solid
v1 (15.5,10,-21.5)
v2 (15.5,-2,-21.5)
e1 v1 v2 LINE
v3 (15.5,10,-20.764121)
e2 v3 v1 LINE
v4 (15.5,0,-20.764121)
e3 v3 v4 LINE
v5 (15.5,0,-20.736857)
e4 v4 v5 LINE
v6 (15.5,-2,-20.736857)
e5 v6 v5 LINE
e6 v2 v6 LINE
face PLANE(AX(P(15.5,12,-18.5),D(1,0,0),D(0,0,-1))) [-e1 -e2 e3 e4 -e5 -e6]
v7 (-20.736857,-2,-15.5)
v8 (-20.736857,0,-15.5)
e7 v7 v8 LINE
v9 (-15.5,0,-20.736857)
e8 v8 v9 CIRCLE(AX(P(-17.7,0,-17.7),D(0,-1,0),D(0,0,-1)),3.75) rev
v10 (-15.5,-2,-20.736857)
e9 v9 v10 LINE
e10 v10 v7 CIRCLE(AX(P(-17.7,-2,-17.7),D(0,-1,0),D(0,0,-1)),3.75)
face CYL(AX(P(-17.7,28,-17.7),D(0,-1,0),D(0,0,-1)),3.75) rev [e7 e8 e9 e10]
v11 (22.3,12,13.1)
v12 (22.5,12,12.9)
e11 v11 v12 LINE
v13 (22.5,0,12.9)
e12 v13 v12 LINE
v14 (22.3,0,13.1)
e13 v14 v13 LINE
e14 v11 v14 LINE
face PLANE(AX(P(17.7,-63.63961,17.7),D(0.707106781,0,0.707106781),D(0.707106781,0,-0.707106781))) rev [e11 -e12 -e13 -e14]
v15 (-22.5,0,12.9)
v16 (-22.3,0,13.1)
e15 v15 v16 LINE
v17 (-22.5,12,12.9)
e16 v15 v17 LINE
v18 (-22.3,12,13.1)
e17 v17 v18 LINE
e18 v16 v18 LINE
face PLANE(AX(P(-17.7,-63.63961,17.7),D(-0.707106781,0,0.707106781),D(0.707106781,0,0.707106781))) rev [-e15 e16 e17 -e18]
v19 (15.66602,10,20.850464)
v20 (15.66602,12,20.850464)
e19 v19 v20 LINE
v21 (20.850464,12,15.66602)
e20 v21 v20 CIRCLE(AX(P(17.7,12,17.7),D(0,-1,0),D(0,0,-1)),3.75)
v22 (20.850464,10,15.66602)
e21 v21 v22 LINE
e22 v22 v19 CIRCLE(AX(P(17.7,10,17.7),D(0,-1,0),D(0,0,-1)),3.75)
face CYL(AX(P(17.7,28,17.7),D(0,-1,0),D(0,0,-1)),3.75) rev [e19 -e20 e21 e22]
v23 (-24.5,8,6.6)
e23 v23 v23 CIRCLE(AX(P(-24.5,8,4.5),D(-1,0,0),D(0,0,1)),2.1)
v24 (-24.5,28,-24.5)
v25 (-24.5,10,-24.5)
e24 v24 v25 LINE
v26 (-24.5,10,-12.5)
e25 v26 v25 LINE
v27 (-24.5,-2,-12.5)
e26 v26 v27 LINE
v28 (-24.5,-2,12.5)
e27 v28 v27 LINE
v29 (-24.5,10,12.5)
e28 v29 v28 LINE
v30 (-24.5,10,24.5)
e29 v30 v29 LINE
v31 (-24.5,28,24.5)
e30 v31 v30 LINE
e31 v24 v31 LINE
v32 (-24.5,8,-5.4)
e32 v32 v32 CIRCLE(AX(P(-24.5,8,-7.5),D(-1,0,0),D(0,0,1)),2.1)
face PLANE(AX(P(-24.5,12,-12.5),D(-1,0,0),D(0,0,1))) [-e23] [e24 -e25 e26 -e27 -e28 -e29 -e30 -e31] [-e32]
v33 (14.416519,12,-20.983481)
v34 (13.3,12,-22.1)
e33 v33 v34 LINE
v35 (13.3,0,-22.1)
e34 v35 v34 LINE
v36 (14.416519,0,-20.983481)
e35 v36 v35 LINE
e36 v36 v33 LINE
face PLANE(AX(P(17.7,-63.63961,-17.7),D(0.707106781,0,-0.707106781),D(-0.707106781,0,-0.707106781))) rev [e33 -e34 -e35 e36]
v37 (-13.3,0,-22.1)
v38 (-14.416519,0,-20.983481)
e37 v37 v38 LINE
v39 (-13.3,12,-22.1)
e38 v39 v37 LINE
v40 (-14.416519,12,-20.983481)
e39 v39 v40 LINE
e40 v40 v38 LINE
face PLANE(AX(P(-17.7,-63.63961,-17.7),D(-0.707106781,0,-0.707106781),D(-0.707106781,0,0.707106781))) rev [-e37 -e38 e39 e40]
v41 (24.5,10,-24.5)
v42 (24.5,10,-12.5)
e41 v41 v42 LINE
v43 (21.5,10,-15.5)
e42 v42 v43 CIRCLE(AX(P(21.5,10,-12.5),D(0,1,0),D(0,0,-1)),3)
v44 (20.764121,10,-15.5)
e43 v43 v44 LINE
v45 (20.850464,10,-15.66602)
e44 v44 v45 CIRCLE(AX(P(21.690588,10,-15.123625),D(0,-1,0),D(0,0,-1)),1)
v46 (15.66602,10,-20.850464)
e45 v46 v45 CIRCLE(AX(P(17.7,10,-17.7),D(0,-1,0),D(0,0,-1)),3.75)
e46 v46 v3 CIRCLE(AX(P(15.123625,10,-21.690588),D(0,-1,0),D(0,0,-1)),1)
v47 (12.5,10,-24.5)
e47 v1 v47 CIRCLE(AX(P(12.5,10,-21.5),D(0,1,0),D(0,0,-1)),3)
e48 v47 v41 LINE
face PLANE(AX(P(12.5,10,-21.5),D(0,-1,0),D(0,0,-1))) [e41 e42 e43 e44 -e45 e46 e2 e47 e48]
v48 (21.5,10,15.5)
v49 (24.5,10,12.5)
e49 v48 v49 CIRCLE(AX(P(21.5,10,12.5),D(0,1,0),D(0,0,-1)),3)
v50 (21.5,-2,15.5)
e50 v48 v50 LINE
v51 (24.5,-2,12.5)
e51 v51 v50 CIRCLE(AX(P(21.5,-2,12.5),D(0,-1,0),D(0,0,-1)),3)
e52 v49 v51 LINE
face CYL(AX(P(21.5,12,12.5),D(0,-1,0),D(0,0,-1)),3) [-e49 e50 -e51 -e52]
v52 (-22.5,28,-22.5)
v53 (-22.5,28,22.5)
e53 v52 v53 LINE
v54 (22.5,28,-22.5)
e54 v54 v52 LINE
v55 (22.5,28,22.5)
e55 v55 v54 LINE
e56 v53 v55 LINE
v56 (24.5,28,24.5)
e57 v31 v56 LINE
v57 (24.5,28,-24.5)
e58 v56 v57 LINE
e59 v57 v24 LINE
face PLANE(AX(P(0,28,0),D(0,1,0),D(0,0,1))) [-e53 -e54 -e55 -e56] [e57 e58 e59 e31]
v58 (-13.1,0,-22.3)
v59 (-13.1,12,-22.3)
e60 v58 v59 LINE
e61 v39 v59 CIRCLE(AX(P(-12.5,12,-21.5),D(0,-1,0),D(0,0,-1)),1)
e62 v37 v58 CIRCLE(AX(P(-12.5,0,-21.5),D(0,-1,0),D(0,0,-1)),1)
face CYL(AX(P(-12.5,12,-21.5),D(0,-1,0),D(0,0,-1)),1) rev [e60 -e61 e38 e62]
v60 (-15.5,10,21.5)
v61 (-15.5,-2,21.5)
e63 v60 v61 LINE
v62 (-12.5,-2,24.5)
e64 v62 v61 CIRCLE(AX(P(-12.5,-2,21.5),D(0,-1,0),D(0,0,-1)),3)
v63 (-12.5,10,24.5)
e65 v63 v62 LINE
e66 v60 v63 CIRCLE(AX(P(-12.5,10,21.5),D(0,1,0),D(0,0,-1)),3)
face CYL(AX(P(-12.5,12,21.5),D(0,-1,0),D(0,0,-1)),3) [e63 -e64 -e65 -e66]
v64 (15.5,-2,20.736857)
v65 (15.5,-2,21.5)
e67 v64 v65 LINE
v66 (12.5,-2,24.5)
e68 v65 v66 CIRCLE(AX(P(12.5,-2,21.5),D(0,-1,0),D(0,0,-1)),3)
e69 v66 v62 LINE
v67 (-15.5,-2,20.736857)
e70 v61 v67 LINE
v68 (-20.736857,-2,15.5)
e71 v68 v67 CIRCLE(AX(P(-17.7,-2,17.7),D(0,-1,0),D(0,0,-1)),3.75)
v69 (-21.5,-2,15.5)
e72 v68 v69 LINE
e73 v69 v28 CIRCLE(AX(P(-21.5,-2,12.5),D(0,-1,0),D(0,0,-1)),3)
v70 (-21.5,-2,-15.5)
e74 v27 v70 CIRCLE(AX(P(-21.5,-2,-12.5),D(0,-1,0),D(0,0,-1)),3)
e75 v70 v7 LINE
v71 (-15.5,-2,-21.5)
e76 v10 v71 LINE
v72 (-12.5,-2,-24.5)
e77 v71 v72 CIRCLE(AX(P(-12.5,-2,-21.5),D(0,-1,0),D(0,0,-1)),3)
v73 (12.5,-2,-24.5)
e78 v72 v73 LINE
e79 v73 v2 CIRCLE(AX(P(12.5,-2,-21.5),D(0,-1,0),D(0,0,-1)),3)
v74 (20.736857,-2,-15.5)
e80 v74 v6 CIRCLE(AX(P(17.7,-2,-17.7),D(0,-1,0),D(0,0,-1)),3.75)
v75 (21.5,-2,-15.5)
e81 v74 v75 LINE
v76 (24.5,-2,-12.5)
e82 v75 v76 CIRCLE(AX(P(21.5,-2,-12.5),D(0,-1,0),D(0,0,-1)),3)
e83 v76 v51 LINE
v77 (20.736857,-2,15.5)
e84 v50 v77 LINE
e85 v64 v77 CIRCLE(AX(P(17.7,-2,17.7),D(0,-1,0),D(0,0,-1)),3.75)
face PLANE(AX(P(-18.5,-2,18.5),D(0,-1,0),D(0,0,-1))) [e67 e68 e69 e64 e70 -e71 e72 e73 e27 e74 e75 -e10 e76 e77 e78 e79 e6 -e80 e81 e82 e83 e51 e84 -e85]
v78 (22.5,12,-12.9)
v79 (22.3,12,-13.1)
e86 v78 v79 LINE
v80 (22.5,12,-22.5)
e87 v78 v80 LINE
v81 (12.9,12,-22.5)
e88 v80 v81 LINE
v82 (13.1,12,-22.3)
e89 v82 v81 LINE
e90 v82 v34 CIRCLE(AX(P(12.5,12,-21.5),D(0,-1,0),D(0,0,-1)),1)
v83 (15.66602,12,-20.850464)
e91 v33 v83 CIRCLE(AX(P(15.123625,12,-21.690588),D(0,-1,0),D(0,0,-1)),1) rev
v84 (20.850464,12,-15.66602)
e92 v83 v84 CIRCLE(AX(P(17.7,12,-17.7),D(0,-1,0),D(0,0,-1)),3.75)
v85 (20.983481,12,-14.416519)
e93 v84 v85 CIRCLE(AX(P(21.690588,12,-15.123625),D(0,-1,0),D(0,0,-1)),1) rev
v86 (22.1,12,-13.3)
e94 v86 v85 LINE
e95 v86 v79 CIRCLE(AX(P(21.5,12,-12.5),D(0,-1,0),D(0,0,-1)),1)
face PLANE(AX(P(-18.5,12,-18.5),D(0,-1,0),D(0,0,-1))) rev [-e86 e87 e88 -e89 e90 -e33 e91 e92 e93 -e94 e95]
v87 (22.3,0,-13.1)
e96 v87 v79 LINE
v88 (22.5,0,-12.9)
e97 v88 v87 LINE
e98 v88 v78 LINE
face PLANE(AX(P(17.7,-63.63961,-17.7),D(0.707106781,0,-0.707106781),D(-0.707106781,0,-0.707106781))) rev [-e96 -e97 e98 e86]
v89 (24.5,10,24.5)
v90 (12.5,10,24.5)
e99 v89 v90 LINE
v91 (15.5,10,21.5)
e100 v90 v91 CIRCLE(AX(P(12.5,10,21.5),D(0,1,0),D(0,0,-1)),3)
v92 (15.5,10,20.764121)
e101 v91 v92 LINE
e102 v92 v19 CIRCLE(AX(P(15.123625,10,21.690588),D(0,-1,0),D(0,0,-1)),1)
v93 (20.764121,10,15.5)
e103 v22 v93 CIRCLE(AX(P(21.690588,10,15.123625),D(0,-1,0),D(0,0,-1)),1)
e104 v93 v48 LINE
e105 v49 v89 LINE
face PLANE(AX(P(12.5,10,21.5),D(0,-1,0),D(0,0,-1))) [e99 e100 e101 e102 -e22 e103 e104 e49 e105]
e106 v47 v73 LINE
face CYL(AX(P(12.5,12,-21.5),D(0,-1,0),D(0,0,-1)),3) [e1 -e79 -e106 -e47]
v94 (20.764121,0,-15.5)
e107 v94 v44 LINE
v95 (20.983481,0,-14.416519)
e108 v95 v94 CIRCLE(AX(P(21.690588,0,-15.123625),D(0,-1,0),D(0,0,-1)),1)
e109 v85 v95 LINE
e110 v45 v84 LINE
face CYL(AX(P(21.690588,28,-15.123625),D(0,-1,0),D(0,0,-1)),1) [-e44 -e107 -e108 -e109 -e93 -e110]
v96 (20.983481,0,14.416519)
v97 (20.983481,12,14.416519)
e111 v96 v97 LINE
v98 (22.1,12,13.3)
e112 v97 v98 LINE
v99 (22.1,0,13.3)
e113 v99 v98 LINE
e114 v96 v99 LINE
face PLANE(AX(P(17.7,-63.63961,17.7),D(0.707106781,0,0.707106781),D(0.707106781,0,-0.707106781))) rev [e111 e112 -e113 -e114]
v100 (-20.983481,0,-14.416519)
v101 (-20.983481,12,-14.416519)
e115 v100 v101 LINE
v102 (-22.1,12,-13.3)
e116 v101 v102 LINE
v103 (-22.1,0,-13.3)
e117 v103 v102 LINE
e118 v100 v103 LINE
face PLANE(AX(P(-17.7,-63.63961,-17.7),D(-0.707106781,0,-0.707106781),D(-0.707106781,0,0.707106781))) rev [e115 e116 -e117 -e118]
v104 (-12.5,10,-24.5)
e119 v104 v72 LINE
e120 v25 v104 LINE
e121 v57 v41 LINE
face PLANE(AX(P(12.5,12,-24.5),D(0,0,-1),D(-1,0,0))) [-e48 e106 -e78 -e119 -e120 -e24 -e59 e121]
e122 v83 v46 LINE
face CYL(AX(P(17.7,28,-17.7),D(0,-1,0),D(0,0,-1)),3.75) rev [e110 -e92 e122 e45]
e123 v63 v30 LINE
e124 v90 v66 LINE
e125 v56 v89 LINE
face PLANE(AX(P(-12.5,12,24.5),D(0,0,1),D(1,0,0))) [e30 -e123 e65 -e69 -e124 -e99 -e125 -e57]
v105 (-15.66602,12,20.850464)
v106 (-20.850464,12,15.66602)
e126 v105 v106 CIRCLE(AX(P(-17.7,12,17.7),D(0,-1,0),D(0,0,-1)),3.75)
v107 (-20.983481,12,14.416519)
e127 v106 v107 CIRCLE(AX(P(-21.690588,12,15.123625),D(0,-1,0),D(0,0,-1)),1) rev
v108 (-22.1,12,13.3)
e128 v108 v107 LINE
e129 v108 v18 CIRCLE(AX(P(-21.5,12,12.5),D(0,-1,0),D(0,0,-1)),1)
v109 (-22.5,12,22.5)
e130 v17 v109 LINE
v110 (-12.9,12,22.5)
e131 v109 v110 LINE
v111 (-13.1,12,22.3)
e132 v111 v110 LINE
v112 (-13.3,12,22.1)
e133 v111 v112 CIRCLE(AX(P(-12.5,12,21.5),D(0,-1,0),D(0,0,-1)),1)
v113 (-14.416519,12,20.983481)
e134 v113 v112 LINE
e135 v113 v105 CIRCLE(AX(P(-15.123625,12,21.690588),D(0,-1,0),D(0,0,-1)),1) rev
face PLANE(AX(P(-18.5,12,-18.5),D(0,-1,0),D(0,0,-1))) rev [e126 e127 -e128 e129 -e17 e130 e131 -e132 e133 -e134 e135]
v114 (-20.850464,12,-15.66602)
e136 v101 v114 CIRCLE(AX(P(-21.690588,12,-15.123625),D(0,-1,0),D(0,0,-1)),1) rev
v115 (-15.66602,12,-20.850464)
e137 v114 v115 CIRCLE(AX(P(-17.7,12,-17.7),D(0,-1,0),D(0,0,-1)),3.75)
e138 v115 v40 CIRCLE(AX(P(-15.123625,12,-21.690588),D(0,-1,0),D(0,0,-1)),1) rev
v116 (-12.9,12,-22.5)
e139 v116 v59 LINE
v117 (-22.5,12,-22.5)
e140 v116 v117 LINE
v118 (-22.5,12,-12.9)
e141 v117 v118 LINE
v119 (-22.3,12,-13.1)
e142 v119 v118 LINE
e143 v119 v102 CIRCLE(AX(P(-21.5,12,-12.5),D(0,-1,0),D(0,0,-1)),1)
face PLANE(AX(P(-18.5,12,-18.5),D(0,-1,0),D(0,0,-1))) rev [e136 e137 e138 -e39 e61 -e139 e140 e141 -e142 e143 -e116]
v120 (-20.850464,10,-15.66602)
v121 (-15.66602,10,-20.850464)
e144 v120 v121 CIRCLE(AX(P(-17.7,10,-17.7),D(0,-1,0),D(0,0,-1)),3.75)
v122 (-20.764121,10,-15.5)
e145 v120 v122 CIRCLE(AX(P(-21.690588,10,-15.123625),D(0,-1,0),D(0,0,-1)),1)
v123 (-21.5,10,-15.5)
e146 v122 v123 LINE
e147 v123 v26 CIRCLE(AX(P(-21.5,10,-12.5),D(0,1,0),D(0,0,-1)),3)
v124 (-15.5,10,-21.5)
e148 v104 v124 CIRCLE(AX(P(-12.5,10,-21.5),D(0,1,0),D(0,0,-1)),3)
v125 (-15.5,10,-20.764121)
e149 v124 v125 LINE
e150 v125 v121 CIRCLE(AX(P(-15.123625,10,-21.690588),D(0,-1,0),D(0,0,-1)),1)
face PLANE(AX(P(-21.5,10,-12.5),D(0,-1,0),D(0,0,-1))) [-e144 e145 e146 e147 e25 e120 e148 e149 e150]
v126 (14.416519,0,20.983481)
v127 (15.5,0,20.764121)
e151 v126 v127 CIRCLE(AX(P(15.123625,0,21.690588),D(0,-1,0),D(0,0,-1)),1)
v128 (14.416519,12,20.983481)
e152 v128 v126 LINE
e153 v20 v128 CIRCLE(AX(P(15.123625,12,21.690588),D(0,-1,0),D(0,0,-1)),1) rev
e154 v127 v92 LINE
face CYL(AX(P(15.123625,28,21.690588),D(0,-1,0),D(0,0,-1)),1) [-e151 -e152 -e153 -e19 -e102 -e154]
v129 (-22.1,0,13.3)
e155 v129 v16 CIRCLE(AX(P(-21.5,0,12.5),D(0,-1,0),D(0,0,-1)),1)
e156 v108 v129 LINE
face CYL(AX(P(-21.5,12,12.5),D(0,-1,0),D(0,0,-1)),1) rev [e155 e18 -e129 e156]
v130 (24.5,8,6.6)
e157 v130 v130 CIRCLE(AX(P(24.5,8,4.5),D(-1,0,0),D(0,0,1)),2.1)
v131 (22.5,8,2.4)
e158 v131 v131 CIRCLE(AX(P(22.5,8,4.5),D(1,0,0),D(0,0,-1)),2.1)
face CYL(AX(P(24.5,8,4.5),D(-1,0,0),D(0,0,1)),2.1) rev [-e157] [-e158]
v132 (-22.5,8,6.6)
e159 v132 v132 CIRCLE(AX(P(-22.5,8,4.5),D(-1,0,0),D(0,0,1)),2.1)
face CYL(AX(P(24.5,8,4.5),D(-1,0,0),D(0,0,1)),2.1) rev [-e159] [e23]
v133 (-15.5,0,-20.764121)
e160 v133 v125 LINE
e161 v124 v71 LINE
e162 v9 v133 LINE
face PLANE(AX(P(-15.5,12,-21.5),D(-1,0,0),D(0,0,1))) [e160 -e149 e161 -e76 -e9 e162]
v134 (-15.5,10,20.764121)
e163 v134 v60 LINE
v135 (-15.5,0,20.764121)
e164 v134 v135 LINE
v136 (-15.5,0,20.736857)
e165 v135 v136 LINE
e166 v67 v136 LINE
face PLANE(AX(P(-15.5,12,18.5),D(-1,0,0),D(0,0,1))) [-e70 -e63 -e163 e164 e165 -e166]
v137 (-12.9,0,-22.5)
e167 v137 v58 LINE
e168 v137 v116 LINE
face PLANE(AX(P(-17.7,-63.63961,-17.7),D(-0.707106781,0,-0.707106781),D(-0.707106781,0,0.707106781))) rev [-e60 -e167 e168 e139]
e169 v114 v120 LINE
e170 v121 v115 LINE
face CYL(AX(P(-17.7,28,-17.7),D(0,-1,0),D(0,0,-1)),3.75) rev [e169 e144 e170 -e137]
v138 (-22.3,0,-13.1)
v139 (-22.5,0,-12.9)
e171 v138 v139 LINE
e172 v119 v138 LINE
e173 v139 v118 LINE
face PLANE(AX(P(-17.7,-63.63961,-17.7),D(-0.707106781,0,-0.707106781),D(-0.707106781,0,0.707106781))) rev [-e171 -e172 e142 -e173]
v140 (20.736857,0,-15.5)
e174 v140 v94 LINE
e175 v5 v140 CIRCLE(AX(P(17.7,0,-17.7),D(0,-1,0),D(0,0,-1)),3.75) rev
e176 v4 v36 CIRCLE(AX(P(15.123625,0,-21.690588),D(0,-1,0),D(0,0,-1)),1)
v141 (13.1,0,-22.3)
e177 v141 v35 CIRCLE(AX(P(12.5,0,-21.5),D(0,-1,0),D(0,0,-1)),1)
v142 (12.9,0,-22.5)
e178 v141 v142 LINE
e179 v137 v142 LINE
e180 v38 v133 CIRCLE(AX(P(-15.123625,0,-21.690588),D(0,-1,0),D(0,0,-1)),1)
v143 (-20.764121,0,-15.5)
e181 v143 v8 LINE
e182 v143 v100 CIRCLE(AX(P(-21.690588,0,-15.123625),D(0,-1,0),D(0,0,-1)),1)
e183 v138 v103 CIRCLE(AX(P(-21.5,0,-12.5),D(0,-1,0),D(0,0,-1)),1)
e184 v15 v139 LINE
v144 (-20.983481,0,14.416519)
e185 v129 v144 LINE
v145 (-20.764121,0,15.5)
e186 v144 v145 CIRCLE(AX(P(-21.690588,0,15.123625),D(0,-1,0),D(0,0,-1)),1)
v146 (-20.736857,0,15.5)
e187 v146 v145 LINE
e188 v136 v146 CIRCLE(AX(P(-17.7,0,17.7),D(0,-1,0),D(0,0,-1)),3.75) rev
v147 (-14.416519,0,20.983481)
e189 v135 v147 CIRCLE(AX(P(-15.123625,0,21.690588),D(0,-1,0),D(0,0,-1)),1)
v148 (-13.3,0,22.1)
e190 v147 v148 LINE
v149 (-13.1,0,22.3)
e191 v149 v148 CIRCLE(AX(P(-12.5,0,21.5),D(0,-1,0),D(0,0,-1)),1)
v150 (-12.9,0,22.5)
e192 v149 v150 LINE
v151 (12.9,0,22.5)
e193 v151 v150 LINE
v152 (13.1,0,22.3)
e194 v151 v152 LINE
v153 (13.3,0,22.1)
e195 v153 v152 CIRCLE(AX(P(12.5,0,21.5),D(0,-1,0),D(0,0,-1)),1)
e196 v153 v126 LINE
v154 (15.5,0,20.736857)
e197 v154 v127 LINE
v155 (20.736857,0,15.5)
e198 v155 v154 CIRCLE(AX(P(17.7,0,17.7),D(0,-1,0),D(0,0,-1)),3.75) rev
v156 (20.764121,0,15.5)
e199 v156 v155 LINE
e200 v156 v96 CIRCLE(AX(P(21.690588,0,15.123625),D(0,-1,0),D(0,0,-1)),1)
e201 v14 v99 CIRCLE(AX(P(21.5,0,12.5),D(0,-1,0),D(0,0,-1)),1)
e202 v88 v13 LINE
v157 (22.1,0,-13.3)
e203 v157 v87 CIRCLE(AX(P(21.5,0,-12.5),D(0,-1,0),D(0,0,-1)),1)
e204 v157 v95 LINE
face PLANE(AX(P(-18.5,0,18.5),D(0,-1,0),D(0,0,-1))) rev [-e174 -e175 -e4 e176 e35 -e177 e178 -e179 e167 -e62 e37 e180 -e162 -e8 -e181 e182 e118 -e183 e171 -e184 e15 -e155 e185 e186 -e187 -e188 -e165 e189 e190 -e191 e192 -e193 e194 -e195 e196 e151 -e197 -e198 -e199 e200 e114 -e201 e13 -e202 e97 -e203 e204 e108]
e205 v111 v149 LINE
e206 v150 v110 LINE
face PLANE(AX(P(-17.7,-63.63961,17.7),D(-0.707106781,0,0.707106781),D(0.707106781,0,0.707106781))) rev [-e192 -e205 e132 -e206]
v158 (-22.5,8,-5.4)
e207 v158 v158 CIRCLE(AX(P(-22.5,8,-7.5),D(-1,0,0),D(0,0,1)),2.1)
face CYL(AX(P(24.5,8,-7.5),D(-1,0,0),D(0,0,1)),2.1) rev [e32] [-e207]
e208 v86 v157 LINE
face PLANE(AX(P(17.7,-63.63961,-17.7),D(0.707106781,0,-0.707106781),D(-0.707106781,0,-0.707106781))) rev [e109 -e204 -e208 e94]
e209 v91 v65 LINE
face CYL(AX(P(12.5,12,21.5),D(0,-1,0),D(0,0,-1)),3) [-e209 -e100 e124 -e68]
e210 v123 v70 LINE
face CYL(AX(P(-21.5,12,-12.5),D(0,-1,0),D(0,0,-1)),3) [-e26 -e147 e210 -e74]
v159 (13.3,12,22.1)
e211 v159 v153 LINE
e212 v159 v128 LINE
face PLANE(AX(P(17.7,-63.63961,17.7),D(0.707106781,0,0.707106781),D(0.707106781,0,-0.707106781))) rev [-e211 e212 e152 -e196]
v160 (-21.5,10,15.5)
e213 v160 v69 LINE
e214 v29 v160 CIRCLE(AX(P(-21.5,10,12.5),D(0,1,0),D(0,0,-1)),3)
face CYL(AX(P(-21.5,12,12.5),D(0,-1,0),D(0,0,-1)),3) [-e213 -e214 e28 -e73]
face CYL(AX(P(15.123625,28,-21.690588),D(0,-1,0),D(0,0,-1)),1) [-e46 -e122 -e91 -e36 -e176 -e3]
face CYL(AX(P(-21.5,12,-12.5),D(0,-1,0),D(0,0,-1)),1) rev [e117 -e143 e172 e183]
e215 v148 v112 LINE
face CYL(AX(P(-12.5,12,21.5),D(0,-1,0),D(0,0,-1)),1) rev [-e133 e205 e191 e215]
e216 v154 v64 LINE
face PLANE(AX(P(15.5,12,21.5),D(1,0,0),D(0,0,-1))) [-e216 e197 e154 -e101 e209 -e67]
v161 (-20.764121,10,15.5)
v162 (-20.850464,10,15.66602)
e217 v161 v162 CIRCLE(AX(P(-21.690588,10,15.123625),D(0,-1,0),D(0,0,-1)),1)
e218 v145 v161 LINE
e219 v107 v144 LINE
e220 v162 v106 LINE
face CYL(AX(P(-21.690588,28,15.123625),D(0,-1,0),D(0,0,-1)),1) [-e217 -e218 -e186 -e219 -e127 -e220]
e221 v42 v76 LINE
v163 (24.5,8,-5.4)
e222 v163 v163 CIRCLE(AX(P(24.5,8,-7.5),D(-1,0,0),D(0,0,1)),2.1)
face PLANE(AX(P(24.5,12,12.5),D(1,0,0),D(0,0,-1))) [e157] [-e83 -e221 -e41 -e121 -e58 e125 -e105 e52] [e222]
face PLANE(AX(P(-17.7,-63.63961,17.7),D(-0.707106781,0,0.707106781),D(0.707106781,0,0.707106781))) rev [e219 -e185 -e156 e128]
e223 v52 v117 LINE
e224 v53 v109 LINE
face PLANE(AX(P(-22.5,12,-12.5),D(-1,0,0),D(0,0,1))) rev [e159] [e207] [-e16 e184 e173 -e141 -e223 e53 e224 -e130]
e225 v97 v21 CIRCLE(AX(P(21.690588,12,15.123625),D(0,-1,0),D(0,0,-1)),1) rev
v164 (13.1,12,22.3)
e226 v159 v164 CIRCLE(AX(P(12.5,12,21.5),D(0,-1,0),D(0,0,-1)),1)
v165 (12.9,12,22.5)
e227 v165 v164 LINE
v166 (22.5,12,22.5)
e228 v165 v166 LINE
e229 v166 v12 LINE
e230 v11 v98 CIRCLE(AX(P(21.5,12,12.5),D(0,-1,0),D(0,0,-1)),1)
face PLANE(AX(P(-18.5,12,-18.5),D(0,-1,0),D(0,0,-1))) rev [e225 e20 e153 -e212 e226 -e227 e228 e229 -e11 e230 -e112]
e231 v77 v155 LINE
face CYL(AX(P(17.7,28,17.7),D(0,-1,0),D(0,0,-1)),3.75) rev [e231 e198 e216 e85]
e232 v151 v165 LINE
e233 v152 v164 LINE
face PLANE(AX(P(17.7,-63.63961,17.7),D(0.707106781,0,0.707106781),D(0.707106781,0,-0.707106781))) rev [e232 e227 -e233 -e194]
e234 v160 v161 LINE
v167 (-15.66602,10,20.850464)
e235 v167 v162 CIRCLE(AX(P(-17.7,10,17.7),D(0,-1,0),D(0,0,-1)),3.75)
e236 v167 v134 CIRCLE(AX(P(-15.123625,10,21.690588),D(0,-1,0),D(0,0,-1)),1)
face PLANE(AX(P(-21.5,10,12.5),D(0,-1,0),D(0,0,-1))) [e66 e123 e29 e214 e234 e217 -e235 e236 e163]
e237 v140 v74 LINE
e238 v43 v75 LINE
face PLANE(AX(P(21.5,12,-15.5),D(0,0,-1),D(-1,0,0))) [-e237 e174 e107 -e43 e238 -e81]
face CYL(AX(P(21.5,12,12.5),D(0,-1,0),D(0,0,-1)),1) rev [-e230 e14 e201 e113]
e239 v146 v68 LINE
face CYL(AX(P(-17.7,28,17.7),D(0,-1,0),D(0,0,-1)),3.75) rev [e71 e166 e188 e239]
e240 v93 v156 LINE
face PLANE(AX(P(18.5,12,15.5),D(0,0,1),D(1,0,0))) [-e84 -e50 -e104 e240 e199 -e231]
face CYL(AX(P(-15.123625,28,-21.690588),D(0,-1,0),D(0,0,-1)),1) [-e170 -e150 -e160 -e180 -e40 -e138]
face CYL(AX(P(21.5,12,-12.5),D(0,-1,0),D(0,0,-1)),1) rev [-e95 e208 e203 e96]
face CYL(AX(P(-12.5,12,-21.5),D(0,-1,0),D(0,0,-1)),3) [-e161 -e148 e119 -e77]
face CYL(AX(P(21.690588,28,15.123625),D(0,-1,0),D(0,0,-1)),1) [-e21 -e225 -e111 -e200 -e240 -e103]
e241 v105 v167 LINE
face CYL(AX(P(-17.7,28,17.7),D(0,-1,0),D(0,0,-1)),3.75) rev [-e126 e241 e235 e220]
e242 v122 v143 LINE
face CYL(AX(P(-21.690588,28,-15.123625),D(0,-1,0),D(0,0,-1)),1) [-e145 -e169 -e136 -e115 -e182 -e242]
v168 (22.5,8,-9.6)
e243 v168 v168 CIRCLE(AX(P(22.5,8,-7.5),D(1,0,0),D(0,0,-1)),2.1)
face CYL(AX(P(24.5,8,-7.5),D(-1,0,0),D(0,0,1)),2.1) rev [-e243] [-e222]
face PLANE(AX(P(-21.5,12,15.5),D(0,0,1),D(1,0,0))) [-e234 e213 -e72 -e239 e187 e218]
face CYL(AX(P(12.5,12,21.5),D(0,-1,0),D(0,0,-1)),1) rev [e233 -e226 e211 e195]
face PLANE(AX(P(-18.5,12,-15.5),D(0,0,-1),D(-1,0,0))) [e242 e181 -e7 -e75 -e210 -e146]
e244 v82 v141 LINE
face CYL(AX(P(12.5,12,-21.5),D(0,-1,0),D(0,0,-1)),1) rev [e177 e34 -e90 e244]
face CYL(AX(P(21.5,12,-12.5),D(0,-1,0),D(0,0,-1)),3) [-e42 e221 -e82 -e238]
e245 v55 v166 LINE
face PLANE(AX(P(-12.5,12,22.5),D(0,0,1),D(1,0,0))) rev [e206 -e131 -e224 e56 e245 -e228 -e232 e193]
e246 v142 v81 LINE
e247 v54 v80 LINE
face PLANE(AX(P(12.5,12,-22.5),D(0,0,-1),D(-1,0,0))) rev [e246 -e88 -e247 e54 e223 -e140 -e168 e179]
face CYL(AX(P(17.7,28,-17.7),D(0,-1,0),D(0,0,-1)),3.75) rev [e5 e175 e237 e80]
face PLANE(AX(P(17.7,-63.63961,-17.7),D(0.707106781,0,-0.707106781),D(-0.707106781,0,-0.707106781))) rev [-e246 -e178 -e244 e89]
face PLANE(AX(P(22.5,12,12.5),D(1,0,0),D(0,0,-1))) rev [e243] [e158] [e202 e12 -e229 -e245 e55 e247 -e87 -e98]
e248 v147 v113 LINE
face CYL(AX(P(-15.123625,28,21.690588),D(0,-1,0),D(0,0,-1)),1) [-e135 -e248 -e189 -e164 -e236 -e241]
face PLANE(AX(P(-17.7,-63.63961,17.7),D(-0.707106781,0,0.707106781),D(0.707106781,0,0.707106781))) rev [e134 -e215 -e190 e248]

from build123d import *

# Parameters (mm, degrees)
EXTRUDE_1_DEPTH          = 12
EXTRUDE_START            = 2
EXTRUDE_2_DEPTH          = 2
SKETCH_2_W               = 49
SKETCH_2_H               = 49
SKETCH_2_W_2             = 45
SKETCH_2_H_2             = 45
EXTRUDE_3_DEPTH          = 16
EXTRUDE_4_DEPTH          = 2
SKETCH_5_R               = 2.25
CUT_EXTRUDE_2_DEPTH      = 46.831212072
SKETCH_7_R               = 3.75
CUT_EXTRUDE_3_DEPTH      = 46.831212072
CUT_EXTRUDE_4_DEPTH      = 60.943723608
CUT_EXTRUDE_4_DEPTH_BACK = 60.943723608
SKETCH_8_R               = 2.1
CUT_EXTRUDE_10_DEPTH     = 12
FILLET_2_R               = 1


with BuildPart() as part:
    # 草图3 → 凸台-拉伸1 (new body)
    with BuildSketch(Plane(origin=(0, 0, 0), x_dir=(-1, 0, 0), z_dir=(0, -1, 0))):
        with BuildLine():
            Line((18.5, 15.5), (21.5, 15.5))
            ThreePointArc((21.5, 15.5), (23.621320344, 14.621320344), (24.5, 12.5))
            Line((24.5, 12.5), (24.5, -12.5))
            ThreePointArc((24.5, -12.5), (23.621320344, -14.621320344), (21.5, -15.5))
            Line((21.5, -15.5), (18.5, -15.5))
            ThreePointArc((18.5, -15.5), (16.378679656, -16.378679656), (15.5, -18.5))
            Line((15.5, -18.5), (15.5, -21.5))
            ThreePointArc((15.5, -21.5), (14.621320344, -23.621320344), (12.5, -24.5))
            Line((12.5, -24.5), (-12.5, -24.5))
            ThreePointArc((-12.5, -24.5), (-14.621320344, -23.621320344), (-15.5, -21.5))
            Line((-15.5, -21.5), (-15.5, -18.5))
            ThreePointArc((-15.5, -18.5), (-16.378679656, -16.378679656), (-18.5, -15.5))
            Line((-18.5, -15.5), (-21.5, -15.5))
            ThreePointArc((-21.5, -15.5), (-23.621320344, -14.621320344), (-24.5, -12.5))
            Line((-24.5, -12.5), (-24.5, 12.5))
            ThreePointArc((-24.5, 12.5), (-23.621320344, 14.621320344), (-21.5, 15.5))
            Line((-21.5, 15.5), (-18.5, 15.5))
            ThreePointArc((-18.5, 15.5), (-16.378679656, 16.378679656), (-15.5, 18.5))
            Line((-15.5, 18.5), (-15.5, 21.5))
            ThreePointArc((-15.5, 21.5), (-14.621320344, 23.621320344), (-12.5, 24.5))
            Line((-12.5, 24.5), (12.5, 24.5))
            ThreePointArc((12.5, 24.5), (14.621320344, 23.621320344), (15.5, 21.5))
            Line((15.5, 21.5), (15.5, 18.5))
            ThreePointArc((15.5, 18.5), (16.378679656, 16.378679656), (18.5, 15.5))
        make_face()
        with BuildLine():
            Line((18.5, 13.5), (21.5, 13.5))
            ThreePointArc((21.5, 13.5), (22.207106781, 13.207106781), (22.5, 12.5))
            Line((22.5, 12.5), (22.5, -12.5))
            ThreePointArc((22.5, -12.5), (22.207106781, -13.207106781), (21.5, -13.5))
            Line((21.5, -13.5), (18.5, -13.5))
            ThreePointArc((18.5, -13.5), (14.964466094, -14.964466094), (13.5, -18.5))
            Line((13.5, -18.5), (13.5, -21.5))
            ThreePointArc((13.5, -21.5), (13.207106781, -22.207106781), (12.5, -22.5))
            Line((12.5, -22.5), (-12.5, -22.5))
            ThreePointArc((-12.5, -22.5), (-13.207106781, -22.207106781), (-13.5, -21.5))
            Line((-13.5, -21.5), (-13.5, -18.5))
            ThreePointArc((-13.5, -18.5), (-14.964466094, -14.964466094), (-18.5, -13.5))
            Line((-18.5, -13.5), (-21.5, -13.5))
            ThreePointArc((-21.5, -13.5), (-22.207106781, -13.207106781), (-22.5, -12.5))
            Line((-22.5, -12.5), (-22.5, 12.5))
            ThreePointArc((-22.5, 12.5), (-22.207106781, 13.207106781), (-21.5, 13.5))
            Line((-21.5, 13.5), (-18.5, 13.5))
            ThreePointArc((-18.5, 13.5), (-14.964466094, 14.964466094), (-13.5, 18.5))
            Line((-13.5, 18.5), (-13.5, 21.5))
            ThreePointArc((-13.5, 21.5), (-13.207106781, 22.207106781), (-12.5, 22.5))
            Line((-12.5, 22.5), (12.5, 22.5))
            ThreePointArc((12.5, 22.5), (13.207106781, 22.207106781), (13.5, 21.5))
            Line((13.5, 21.5), (13.5, 18.5))
            ThreePointArc((13.5, 18.5), (14.964466094, 14.964466094), (18.5, 13.5))
        make_face(mode=Mode.SUBTRACT)
    extrude(amount=-EXTRUDE_1_DEPTH)

    # 草图4 → 凸台-拉伸2 (add)
    with BuildSketch(Plane.XZ.offset(EXTRUDE_START)):
        with BuildLine():
            Line((-24.5, 12.5), (-24.5, -12.5))
            ThreePointArc((-24.5, -12.5), (-23.621320344, -14.621320344), (-21.5, -15.5))
            Line((-21.5, -15.5), (-18.5, -15.5))
            ThreePointArc((-18.5, -15.5), (-16.378679656, -16.378679656), (-15.5, -18.5))
            Line((-15.5, -18.5), (-15.5, -21.5))
            ThreePointArc((-15.5, -21.5), (-14.621320344, -23.621320344), (-12.5, -24.5))
            Line((-12.5, -24.5), (12.5, -24.5))
            ThreePointArc((12.5, -24.5), (14.621320344, -23.621320344), (15.5, -21.5))
            Line((15.5, -21.5), (15.5, -18.5))
            ThreePointArc((15.5, -18.5), (16.378679656, -16.378679656), (18.5, -15.5))
            Line((18.5, -15.5), (21.5, -15.5))
            ThreePointArc((21.5, -15.5), (23.621320344, -14.621320344), (24.5, -12.5))
            Line((24.5, -12.5), (24.5, 12.5))
            ThreePointArc((24.5, 12.5), (23.621320344, 14.621320344), (21.5, 15.5))
            Line((21.5, 15.5), (18.5, 15.5))
            ThreePointArc((18.5, 15.5), (16.378679656, 16.378679656), (15.5, 18.5))
            Line((15.5, 18.5), (15.5, 21.5))
            ThreePointArc((15.5, 21.5), (14.621320344, 23.621320344), (12.5, 24.5))
            Line((12.5, 24.5), (-12.5, 24.5))
            ThreePointArc((-12.5, 24.5), (-14.621320344, 23.621320344), (-15.5, 21.5))
            Line((-15.5, 21.5), (-15.5, 18.5))
            ThreePointArc((-15.5, 18.5), (-16.378679656, 16.378679656), (-18.5, 15.5))
            Line((-18.5, 15.5), (-21.5, 15.5))
            ThreePointArc((-21.5, 15.5), (-23.621320344, 14.621320344), (-24.5, 12.5))
        make_face()
    extrude(amount=-EXTRUDE_2_DEPTH)

    # 草图2 → 凸台-拉伸3 (add)
    with BuildSketch(Plane(origin=(0, 12, 0), x_dir=(1, 0, 0), z_dir=(0, 1, 0))):
        Rectangle(SKETCH_2_W, SKETCH_2_H)
        Rectangle(SKETCH_2_W_2, SKETCH_2_H_2, mode=Mode.SUBTRACT)
    extrude(amount=EXTRUDE_3_DEPTH)

    # 草图6 → 凸台-拉伸4 (add)
    with BuildSketch(Plane.XZ.offset(-12).offset(EXTRUDE_START)):
        with BuildLine():
            Line((12.5, 24.5), (24.5, 24.5))
            Line((24.5, 24.5), (24.5, 12.5))
            ThreePointArc((24.5, 12.5), (23.621320344, 14.621320344), (21.5, 15.5))
            Line((21.5, 15.5), (18.5, 15.5))
            ThreePointArc((18.5, 15.5), (16.378679656, 16.378679656), (15.5, 18.5))
            Line((15.5, 18.5), (15.5, 21.5))
            ThreePointArc((15.5, 21.5), (14.621320344, 23.621320344), (12.5, 24.5))
        make_face()
        with BuildLine():
            Line((-24.5, -12.5), (-24.5, -24.5))
            Line((-24.5, -24.5), (-12.5, -24.5))
            ThreePointArc((-12.5, -24.5), (-14.621320344, -23.621320344), (-15.5, -21.5))
            Line((-15.5, -21.5), (-15.5, -18.5))
            ThreePointArc((-15.5, -18.5), (-16.378679656, -16.378679656), (-18.5, -15.5))
            Line((-18.5, -15.5), (-21.5, -15.5))
            ThreePointArc((-21.5, -15.5), (-23.621320344, -14.621320344), (-24.5, -12.5))
        make_face()
        with BuildLine():
            Line((-24.5, 12.5), (-24.5, 24.5))
            Line((-24.5, 24.5), (-12.5, 24.5))
            ThreePointArc((-12.5, 24.5), (-14.621320344, 23.621320344), (-15.5, 21.5))
            Line((-15.5, 21.5), (-15.5, 18.5))
            ThreePointArc((-15.5, 18.5), (-16.378679656, 16.378679656), (-18.5, 15.5))
            Line((-18.5, 15.5), (-21.5, 15.5))
            ThreePointArc((-21.5, 15.5), (-23.621320344, 14.621320344), (-24.5, 12.5))
        make_face()
        with BuildLine():
            Line((12.5, -24.5), (24.5, -24.5))
            Line((24.5, -24.5), (24.5, -12.5))
            ThreePointArc((24.5, -12.5), (23.621320344, -14.621320344), (21.5, -15.5))
            Line((21.5, -15.5), (18.5, -15.5))
            ThreePointArc((18.5, -15.5), (16.378679656, -16.378679656), (15.5, -18.5))
            Line((15.5, -18.5), (15.5, -21.5))
            ThreePointArc((15.5, -21.5), (14.621320344, -23.621320344), (12.5, -24.5))
        make_face()
    extrude(amount=-EXTRUDE_4_DEPTH)

    # 草图5 → 切除-拉伸2 (cut, through all)
    with BuildSketch(Plane.XZ.offset(2)):
        with Locations(Location((-17.7, 17.7, 0), (0, 0, 270))):
            Circle(SKETCH_5_R)
        with Locations(Location((-17.7, -17.7, 0), (0, 0, 270))):
            Circle(SKETCH_5_R)
        with Locations(Location((17.7, 17.7, 0), (0, 0, 270))):
            Circle(SKETCH_5_R)
        with Locations(Location((17.7, -17.7, 0), (0, 0, 270))):
            Circle(SKETCH_5_R)
    extrude(amount=-CUT_EXTRUDE_2_DEPTH, mode=Mode.SUBTRACT)

    # 草图7 → 切除-拉伸3 (cut, through all)
    with BuildSketch(Plane.XZ.offset(2)):
        with Locations(Location((-17.7, 17.7, 0), (0, 0, 270))):
            Circle(SKETCH_7_R)
        with Locations(Location((-17.7, -17.7, 0), (0, 0, 270))):
            Circle(SKETCH_7_R)
        with Locations(Location((17.7, -17.7, 0), (0, 0, 270))):
            Circle(SKETCH_7_R)
        with Locations(Location((17.7, 17.7, 0), (0, 0, 270))):
            Circle(SKETCH_7_R)
    extrude(amount=-CUT_EXTRUDE_3_DEPTH, mode=Mode.SUBTRACT)

    # 草图8 → 切除-拉伸4 (cut, two sides: drawn at the far end of the back side and taken through both)
    with BuildSketch(Plane.ZY.offset(-22.5).offset(-CUT_EXTRUDE_4_DEPTH_BACK)):
        with Locations((-7.5, 8)):
            Circle(SKETCH_8_R)
        with Locations((4.5, 8)):
            Circle(SKETCH_8_R)
    extrude(amount=CUT_EXTRUDE_4_DEPTH + CUT_EXTRUDE_4_DEPTH_BACK, mode=Mode.SUBTRACT)

    # 草图15 → 切除-拉伸10 (cut)
    with BuildSketch(Plane(origin=(0, 12, 0), x_dir=(1, 0, 0), z_dir=(0, 1, 0))):
        Polygon((-22.5, 12.9), (-22.5, -12.9), (-17.7, -17.7), (-12.9, -22.5), (12.9, -22.5), (17.7, -17.7), (22.5, -12.9), (22.5, 12.9), (17.7, 17.7), (12.9, 22.5), (-12.9, 22.5), (-17.7, 17.7), align=None)
    extrude(amount=-CUT_EXTRUDE_10_DEPTH, mode=Mode.SUBTRACT)

    # 圆角2
    # the kernel refuses this fillet: 1 mm, written as the material it takes off along each edge
    with BuildSketch(Plane(origin=(-15.048349571, 14.233859763, 20.351650429), x_dir=(-0.7779866052155301, 0, 0.6282808624375049), z_dir=(0, -1, 0))) as fillet_2_piece_1:
        with BuildLine():
            CenterArc((0.89979254, -0.994381263), FILLET_2_R, 96.076598735, 77.846802531)
            Line((-0.094588722, -0.888523317), (0, 0))
            ThreePointArc((0, 0), (0.396967297, -0.021070265), (0.793934594, 0))
        make_face()
    extrude(amount=14.233859763, mode=Mode.SUBTRACT)
    with BuildSketch(Plane(origin=(-20.351650429, 14.233859763, 15.048349571), x_dir=(-0.7071067811865058, 0, -0.7071067811865893), z_dir=(0, -1, 0)), Plane(origin=(-15.048349571, 14.233859763, -20.351650429), x_dir=(0.7071067811865506, 0, -0.7071067811865446), z_dir=(0, -1, 0))) as fillet_2_piece_2:
        with BuildLine():
            CenterArc((0.893543905, -1), FILLET_2_R, 90, 77.846802531)
            ThreePointArc((-0.084044285, -0.789473684), (-0.021070265, -0.396967297), (0, 0))
            Line((0, 0), (0.893543905, 0))
        make_face()
    extrude(amount=14.233859763, mode=Mode.SUBTRACT)
    with BuildSketch(Plane(origin=(20.351650429, 14.233859763, 15.048349571), x_dir=(0.7071067811864988, 0, -0.7071067811865962), z_dir=(0, -1, 0)), Plane(origin=(-20.351650429, 14.233859763, -15.048349571), x_dir=(-0.7071067811865525, 0, 0.7071067811865426), z_dir=(0, -1, 0)), Plane(origin=(15.048349571, 14.233859763, -20.351650429), x_dir=(-0.7071067811865416, 0, -0.7071067811865536), z_dir=(0, -1, 0))) as fillet_2_piece_3:
        with BuildLine():
            CenterArc((0.893543905, 1), FILLET_2_R, 192.153197469, 77.846802531)
            ThreePointArc((-0.084044285, 0.789473684), (-0.021070265, 0.396967297), (0, 0))
            Line((0, 0), (0.893543905, 0))
        make_face()
    extrude(amount=14.233859763, mode=Mode.SUBTRACT)
    with BuildSketch(Plane(origin=(15.048349571, 14.233859763, 20.351650429), x_dir=(0.7779866052154646, 0, 0.6282808624375861), z_dir=(0, -1, 0)), Plane(origin=(20.351650429, 14.233859763, -15.048349571), x_dir=(0.628280862437575, 0, -0.7779866052154735), z_dir=(0, -1, 0))) as fillet_2_piece_4:
        with BuildLine():
            CenterArc((0.89979254, 0.994381263), FILLET_2_R, 186.076598734, 77.846802531)
            Line((-0.094588722, 0.888523317), (0, 0))
            ThreePointArc((0, 0), (0.396967297, 0.021070265), (0.793934594, 0))
        make_face()
    extrude(amount=14.233859763, mode=Mode.SUBTRACT)


solid = part.part
